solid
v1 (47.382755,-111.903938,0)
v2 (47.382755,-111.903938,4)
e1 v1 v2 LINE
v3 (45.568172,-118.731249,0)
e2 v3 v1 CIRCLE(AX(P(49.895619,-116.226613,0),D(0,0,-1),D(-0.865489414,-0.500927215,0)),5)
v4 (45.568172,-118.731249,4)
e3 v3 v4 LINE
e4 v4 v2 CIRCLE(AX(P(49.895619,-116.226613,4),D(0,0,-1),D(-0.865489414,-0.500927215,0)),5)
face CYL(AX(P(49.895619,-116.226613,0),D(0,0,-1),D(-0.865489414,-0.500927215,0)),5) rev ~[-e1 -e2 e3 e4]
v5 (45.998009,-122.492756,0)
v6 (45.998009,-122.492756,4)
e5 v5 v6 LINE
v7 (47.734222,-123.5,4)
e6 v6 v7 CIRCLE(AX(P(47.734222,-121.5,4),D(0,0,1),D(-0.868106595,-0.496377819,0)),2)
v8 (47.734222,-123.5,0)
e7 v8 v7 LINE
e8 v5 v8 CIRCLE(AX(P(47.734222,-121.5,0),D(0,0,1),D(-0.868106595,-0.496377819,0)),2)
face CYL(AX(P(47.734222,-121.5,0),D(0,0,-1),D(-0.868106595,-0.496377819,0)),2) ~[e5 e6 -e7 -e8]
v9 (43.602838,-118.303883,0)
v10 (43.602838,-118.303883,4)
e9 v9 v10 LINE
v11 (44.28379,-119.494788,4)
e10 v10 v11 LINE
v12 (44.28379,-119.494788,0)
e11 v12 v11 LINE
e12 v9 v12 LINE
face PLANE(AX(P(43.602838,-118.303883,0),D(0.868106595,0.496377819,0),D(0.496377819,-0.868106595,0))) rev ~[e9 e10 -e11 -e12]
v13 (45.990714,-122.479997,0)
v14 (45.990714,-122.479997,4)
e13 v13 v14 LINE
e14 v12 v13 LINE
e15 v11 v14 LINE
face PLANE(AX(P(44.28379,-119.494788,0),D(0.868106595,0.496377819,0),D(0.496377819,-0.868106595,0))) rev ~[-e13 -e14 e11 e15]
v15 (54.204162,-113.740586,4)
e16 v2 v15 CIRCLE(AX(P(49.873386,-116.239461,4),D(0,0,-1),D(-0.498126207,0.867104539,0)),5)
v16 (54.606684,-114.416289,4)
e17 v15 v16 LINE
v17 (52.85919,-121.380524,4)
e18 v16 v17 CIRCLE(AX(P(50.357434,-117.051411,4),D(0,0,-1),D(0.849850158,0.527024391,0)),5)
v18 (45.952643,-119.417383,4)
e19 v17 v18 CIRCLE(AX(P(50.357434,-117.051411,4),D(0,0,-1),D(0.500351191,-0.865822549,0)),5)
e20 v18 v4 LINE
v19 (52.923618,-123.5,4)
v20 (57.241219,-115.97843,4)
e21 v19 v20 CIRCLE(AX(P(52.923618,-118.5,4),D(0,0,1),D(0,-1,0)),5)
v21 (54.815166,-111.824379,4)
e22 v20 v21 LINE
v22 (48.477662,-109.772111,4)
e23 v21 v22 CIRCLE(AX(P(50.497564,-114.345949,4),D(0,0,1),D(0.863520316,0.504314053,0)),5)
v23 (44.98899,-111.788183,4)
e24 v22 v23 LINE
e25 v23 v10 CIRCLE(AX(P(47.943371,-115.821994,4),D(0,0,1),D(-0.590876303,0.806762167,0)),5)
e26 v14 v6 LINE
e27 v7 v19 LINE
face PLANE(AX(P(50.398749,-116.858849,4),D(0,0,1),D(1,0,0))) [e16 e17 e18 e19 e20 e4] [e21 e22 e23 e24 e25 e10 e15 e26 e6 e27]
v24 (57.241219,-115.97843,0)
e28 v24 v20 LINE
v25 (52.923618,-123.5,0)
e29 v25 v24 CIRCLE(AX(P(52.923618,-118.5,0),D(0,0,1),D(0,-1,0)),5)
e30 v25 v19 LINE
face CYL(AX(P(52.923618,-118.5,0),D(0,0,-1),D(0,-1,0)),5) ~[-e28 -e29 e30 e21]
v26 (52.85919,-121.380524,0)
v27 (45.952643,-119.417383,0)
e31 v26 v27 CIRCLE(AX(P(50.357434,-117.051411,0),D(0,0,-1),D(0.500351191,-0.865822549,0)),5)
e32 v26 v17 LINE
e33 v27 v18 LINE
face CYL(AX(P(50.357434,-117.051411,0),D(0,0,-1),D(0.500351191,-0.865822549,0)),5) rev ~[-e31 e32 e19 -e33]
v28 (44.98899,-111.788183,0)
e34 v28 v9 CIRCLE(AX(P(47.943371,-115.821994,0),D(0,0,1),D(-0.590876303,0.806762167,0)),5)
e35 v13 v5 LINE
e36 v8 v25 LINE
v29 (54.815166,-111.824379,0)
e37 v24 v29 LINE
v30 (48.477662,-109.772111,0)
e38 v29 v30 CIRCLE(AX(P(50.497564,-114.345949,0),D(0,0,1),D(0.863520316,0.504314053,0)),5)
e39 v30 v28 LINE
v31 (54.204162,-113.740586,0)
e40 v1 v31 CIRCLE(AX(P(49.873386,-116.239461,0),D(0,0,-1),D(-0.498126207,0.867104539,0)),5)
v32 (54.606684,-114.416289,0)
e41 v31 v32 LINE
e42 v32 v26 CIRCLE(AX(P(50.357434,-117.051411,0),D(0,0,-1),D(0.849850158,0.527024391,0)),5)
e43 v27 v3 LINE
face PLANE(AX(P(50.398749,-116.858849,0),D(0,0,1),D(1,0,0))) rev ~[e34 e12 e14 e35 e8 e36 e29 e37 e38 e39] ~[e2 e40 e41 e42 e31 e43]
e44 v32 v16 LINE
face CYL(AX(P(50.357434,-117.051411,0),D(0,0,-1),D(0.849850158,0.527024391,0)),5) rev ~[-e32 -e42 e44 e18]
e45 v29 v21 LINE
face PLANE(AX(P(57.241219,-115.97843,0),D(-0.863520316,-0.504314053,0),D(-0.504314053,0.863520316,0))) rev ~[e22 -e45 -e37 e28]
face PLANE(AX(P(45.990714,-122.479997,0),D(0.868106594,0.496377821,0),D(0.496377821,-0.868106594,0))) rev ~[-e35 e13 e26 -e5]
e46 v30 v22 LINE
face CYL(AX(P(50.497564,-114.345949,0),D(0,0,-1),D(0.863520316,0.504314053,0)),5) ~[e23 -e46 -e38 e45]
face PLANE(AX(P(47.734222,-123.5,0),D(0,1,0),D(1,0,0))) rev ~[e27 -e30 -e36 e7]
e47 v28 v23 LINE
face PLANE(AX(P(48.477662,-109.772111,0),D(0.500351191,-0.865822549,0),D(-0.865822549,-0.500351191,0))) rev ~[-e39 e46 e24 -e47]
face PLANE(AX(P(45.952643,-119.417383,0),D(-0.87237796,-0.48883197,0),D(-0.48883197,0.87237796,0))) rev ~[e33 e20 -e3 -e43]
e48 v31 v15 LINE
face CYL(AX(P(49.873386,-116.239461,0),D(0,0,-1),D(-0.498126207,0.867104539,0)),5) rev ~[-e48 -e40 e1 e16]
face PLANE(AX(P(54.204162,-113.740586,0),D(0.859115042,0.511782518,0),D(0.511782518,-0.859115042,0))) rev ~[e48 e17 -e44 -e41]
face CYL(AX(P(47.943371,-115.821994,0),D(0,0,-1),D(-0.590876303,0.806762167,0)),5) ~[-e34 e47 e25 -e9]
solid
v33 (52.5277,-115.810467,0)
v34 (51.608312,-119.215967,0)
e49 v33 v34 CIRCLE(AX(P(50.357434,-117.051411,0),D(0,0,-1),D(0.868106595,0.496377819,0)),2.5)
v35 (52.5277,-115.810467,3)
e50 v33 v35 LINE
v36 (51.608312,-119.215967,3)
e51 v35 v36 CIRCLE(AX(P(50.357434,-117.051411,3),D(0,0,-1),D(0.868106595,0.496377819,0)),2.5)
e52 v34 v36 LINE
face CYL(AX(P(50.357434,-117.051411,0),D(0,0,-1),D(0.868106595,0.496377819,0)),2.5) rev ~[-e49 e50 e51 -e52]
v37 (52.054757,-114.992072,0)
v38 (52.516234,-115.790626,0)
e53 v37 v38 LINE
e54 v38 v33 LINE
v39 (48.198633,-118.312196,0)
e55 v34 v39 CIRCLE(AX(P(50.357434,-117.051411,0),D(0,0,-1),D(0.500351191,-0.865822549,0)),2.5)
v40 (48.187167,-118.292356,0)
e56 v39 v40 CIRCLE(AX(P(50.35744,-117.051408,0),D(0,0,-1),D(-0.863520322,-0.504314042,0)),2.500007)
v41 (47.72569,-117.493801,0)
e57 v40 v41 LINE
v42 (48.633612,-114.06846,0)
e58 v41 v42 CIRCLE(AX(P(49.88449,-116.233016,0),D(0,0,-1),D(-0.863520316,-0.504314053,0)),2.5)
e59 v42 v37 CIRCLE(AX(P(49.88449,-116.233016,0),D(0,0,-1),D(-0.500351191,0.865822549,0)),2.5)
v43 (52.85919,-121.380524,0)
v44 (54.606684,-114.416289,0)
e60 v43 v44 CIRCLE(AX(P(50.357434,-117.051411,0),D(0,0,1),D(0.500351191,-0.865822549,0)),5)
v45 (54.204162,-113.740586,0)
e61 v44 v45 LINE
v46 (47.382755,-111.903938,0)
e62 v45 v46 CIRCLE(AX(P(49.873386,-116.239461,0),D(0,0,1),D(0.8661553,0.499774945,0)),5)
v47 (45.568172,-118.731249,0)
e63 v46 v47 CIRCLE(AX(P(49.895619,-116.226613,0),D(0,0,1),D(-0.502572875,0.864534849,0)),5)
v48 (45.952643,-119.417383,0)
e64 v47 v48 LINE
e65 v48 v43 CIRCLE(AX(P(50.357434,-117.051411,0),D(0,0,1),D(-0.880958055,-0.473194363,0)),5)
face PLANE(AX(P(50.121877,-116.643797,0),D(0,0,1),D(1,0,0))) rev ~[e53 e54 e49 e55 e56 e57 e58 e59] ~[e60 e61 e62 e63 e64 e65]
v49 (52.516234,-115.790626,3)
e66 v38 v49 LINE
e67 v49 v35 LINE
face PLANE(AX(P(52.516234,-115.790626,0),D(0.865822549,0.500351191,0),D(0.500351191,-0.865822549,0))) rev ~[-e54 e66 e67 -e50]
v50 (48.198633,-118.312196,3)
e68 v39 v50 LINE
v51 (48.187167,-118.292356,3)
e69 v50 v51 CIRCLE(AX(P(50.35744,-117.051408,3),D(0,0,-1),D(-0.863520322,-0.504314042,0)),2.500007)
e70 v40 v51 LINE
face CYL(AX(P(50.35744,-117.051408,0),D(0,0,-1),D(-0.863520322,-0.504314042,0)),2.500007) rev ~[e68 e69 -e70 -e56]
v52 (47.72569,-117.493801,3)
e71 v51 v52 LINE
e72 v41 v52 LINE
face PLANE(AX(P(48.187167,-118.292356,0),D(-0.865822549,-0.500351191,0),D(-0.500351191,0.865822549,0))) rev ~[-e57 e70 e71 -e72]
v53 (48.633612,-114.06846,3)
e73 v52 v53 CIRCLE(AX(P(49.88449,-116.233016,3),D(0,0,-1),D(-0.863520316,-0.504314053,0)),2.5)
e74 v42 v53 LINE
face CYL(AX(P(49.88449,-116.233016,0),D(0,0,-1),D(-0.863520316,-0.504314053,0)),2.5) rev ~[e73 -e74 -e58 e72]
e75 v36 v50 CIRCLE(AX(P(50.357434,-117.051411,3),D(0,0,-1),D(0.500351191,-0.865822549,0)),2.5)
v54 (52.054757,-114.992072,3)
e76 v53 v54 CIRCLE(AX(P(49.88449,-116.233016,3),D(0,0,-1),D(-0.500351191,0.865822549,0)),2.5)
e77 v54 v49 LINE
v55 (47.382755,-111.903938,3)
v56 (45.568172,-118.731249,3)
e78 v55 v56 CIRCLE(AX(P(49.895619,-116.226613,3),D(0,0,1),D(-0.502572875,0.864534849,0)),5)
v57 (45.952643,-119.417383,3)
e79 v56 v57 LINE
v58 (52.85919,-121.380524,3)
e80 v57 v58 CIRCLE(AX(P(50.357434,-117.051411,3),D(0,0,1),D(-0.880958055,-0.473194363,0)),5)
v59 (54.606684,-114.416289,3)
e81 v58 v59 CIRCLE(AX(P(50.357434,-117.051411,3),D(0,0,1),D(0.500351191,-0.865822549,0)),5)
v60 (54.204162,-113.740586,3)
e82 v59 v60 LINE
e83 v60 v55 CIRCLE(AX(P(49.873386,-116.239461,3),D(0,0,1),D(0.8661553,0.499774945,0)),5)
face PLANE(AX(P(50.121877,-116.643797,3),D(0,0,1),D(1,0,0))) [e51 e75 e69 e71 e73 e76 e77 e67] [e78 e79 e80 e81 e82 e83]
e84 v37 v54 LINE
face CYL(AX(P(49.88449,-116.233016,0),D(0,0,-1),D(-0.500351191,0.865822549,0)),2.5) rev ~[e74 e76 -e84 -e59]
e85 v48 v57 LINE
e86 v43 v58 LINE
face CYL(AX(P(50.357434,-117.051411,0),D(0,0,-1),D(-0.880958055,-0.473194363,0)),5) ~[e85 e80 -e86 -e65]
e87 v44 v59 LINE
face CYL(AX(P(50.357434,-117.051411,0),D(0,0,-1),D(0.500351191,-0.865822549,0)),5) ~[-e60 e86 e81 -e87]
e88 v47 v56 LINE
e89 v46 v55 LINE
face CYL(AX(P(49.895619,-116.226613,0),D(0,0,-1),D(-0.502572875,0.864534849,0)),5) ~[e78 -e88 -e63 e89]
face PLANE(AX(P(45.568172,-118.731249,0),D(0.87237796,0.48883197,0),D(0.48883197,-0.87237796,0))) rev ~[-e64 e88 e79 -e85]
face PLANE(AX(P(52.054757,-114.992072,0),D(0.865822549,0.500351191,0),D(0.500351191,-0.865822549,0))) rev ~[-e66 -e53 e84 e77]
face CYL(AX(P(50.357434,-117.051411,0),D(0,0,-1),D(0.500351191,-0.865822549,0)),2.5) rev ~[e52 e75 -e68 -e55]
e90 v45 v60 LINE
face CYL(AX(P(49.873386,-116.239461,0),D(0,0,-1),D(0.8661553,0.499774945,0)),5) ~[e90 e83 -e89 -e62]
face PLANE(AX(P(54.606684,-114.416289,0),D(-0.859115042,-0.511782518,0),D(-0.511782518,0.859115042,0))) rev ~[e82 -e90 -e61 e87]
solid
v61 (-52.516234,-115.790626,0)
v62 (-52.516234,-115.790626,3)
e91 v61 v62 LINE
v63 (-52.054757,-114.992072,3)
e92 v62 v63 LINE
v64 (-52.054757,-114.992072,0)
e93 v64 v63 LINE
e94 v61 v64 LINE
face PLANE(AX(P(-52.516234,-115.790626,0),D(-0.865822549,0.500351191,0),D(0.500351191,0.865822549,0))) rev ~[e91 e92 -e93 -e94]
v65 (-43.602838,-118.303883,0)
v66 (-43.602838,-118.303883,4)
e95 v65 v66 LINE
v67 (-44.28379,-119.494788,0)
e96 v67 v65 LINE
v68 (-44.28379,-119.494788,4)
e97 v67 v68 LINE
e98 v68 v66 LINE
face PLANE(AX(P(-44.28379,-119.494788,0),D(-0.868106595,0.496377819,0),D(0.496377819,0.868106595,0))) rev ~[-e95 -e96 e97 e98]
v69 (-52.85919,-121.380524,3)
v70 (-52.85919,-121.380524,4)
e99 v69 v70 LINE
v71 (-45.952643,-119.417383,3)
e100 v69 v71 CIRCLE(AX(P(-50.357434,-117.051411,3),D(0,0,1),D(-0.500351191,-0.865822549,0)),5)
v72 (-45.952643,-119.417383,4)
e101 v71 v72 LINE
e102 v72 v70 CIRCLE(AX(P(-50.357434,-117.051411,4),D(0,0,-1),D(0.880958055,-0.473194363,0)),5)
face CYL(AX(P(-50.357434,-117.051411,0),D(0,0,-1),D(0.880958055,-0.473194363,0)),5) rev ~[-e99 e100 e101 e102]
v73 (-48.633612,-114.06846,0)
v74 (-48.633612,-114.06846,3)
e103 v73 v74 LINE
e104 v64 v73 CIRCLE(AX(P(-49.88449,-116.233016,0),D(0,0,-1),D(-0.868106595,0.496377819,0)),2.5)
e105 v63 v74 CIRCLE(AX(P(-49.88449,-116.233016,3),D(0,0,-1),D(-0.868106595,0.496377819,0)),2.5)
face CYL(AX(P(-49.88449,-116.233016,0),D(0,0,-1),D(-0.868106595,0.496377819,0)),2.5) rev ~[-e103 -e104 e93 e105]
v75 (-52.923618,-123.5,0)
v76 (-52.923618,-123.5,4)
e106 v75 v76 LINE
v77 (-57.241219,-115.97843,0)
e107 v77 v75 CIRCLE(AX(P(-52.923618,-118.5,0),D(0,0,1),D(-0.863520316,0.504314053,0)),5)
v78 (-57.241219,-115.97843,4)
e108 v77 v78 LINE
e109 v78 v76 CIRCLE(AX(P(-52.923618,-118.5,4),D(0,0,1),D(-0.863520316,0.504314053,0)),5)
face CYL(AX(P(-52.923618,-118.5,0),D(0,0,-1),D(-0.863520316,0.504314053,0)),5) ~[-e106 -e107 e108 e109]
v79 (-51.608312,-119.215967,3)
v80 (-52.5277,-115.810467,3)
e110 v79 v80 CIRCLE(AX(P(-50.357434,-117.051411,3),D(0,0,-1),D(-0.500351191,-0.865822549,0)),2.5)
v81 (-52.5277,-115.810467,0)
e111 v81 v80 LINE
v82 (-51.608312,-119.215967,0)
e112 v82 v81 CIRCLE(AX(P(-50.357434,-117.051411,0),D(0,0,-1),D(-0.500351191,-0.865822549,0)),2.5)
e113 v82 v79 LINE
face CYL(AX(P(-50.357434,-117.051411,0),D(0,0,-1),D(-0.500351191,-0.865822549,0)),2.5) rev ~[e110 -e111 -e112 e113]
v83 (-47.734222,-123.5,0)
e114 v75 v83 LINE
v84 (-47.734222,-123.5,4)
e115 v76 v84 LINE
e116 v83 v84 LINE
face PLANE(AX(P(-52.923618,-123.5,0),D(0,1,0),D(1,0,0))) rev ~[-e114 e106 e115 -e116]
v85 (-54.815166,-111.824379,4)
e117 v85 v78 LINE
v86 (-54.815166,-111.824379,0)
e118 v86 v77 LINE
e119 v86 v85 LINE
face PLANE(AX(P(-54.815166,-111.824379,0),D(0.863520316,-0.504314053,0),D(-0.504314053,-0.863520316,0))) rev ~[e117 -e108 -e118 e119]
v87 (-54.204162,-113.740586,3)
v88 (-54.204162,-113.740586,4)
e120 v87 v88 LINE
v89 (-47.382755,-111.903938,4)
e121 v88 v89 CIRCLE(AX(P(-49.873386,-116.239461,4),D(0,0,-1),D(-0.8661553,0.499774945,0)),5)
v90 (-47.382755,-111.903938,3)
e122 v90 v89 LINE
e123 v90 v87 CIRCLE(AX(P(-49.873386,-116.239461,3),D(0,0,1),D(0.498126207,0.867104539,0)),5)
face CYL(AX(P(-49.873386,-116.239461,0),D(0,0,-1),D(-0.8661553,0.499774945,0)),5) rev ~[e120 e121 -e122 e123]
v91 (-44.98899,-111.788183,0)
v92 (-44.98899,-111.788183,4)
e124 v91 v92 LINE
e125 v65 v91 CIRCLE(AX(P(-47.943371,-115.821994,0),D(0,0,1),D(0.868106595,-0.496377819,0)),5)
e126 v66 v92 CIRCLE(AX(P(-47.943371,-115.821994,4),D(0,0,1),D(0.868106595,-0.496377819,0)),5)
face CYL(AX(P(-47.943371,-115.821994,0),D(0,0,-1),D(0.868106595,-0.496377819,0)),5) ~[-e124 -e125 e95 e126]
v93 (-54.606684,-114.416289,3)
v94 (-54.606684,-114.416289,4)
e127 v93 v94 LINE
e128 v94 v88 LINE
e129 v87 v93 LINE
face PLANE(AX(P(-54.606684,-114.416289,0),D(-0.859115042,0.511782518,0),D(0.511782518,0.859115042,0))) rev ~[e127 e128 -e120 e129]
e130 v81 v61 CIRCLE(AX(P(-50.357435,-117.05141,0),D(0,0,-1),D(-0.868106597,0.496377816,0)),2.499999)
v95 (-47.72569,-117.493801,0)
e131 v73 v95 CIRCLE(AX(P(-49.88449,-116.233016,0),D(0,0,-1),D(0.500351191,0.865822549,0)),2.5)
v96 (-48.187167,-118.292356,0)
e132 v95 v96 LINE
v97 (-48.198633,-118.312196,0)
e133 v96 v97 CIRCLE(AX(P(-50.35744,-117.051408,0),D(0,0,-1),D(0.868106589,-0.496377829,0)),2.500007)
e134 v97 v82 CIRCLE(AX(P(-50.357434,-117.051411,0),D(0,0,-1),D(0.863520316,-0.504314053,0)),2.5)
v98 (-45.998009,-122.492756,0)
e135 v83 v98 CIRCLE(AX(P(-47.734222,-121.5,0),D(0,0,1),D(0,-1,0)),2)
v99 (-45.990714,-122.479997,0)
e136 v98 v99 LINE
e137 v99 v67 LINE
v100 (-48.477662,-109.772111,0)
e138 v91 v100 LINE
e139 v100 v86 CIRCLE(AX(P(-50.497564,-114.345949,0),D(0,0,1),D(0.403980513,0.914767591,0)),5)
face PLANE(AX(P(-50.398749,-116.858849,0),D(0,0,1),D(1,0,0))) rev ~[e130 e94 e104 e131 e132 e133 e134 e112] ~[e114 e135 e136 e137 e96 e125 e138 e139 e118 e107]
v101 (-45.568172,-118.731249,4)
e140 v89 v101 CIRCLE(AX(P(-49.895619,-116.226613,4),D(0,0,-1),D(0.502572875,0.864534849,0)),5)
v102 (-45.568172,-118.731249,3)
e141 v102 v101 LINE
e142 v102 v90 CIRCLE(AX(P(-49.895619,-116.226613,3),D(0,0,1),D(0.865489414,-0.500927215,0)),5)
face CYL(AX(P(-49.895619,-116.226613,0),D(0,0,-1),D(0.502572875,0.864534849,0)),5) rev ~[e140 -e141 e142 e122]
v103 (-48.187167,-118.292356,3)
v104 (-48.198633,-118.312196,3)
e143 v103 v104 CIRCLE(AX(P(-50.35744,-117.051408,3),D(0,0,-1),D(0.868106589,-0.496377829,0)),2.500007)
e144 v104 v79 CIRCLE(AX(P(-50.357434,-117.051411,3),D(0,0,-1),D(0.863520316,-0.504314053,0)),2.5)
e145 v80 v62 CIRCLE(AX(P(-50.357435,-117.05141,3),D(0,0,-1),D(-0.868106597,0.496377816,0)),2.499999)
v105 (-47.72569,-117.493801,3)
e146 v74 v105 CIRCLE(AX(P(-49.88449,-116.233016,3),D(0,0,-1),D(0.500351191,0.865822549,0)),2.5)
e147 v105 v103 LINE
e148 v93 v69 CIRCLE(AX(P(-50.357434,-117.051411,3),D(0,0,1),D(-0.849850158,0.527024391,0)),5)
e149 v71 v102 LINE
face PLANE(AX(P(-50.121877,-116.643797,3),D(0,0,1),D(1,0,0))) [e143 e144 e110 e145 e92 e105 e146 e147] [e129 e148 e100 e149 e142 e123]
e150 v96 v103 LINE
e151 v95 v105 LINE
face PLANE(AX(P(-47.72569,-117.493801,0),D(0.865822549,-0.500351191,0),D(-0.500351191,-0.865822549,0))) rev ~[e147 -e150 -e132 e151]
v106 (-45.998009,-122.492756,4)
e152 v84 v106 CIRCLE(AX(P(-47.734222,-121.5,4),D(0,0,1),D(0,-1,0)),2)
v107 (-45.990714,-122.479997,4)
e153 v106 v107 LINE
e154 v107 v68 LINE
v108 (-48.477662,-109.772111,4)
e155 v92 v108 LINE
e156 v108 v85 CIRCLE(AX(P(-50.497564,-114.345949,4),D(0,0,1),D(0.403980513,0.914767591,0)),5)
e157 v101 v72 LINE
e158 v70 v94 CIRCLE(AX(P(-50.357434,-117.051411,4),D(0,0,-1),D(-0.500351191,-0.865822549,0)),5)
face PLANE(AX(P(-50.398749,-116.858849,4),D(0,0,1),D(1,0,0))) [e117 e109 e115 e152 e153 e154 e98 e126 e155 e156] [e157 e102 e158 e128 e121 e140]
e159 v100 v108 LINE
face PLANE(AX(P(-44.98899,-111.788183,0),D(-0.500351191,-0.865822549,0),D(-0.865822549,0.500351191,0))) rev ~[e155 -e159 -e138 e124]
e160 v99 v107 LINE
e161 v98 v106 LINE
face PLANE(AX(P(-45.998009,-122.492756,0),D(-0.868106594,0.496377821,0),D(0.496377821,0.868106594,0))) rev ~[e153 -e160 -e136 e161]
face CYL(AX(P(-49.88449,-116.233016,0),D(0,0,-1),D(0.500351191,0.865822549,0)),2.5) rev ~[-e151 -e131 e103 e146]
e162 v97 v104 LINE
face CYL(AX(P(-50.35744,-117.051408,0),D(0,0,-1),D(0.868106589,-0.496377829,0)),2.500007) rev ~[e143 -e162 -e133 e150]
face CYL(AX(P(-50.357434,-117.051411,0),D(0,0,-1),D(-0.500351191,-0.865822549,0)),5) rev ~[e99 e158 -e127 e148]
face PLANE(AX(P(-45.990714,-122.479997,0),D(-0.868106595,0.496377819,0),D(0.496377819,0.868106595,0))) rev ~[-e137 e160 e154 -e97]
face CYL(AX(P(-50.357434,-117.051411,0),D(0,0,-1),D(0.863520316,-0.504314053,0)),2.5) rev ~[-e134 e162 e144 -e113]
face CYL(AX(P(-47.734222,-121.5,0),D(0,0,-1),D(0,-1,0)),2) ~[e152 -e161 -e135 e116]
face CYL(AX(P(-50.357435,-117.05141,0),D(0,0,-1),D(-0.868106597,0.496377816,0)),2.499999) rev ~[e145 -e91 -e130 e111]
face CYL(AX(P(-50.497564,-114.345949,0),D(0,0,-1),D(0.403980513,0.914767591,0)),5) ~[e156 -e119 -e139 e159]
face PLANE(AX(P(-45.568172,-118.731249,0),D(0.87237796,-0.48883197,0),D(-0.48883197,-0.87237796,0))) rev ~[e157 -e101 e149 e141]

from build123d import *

# Parameters (mm, degrees)
F1_DEPTH = 3
F2_DEPTH = 4


# Not quite as in the source:
# - a feature of the source that left no trace in its solid (it failed there, or was rolled back) is left out


with BuildPart() as f1:
    # F0 (on Top) → F1 (new body)
    with BuildSketch(Plane.XY):
        with BuildLine():
            Line((-45.9526433684, -119.4173828764), (-45.5681720757, -118.7312487792))
            ThreePointArc((-45.5681720757, -118.7312487792), (-45.063382941, -114.9422867004), (-47.382754767, -111.9039384587))
            ThreePointArc((-47.382754767, -111.9039384587), (-51.1733291767, -111.4114028263), (-54.204162304, -113.74058643))
            Line((-54.204162304, -113.74058643), (-54.606684435, -114.4162891074))
            ThreePointArc((-54.606684435, -114.4162891074), (-55.2070897412, -118.268307011), (-52.8591895991, -121.3805238068))
            ThreePointArc((-52.8591895991, -121.3805238068), (-48.9903690941, -121.8608948729), (-45.9526433684, -119.4173828764))
        make_face()
        with BuildLine():
            ThreePointArc((-48.1986328556, -118.3121961967), (-49.7169013888, -119.4679619999), (-51.608311622, -119.2159674351))
            ThreePointArc((-51.608311622, -119.2159674351), (-52.7710236039, -117.703011792), (-52.5277001335, -115.8104665166))
            ThreePointArc((-52.5277001335, -115.8104665166), (-52.5219900166, -115.8005330863), (-52.5162344341, -115.7906259301))
            Line((-52.5162344341, -115.7906259301), (-52.0547569365, -114.9920715737))
            ThreePointArc((-52.0547569365, -114.9920715737), (-50.5360911765, -113.8194261615), (-48.6336124708, -114.0684597488))
            ThreePointArc((-48.6336124708, -114.0684597488), (-47.4679395113, -115.5924838645), (-47.7256896586, -117.4938012538))
            Line((-47.7256896586, -117.4938012538), (-48.1871671562, -118.2923556102))
            ThreePointArc((-48.1871671562, -118.2923556102), (-48.1928772732, -118.3022890405), (-48.1986328556, -118.3121961967))
        make_face(mode=Mode.SUBTRACT)
    extrude(amount=F1_DEPTH)

    # F0 (on Top) → F2 (join)
    with BuildSketch(Plane.XY):
        with BuildLine():
            Line((-44.9889898264, -111.7881834274), (-48.4776615988, -109.7721108748))
            ThreePointArc((-48.4776615988, -109.7721108748), (-52.0379556259, -109.5891437921), (-54.8151657439, -111.8243785613))
            Line((-54.8151657439, -111.8243785613), (-57.2412191282, -115.9784297334))
            ThreePointArc((-57.2412191282, -115.9784297334), (-57.2599668976, -120.989191502), (-52.9236175497, -123.5))
            Line((-52.9236175497, -123.5), (-47.7342220294, -123.5))
            ThreePointArc((-47.7342220294, -123.5), (-46.7306063846, -123.2299582762), (-45.9980088385, -122.4927556374))
            Line((-45.9980088385, -122.4927556374), (-45.9907136957, -122.4799972882))
            Line((-45.9907136957, -122.4799972882), (-44.2837898974, -119.4947877334))
            Line((-44.2837898974, -119.4947877334), (-43.6028383647, -118.3038833569))
            ThreePointArc((-43.6028383647, -118.3038833569), (-43.0528160814, -114.7815764423), (-44.9889898264, -111.7881834274))
        make_face()
        with BuildLine():
            ThreePointArc((-47.382754767, -111.9039384587), (-45.063382941, -114.9422867004), (-45.5681720757, -118.7312487792))
            Line((-45.5681720757, -118.7312487792), (-45.9526433684, -119.4173828764))
            ThreePointArc((-45.9526433684, -119.4173828764), (-48.9903690941, -121.8608948729), (-52.8591895991, -121.3805238068))
            ThreePointArc((-52.8591895991, -121.3805238068), (-55.2070897412, -118.268307011), (-54.606684435, -114.4162891074))
            Line((-54.606684435, -114.4162891074), (-54.204162304, -113.74058643))
            ThreePointArc((-54.204162304, -113.74058643), (-51.1733291767, -111.4114028263), (-47.382754767, -111.9039384587))
        make_face(mode=Mode.SUBTRACT)
    extrude(amount=F2_DEPTH)


with BuildPart() as f1b:
    # F0 (on Top) → F1, piece 2 (new body)
    with BuildSketch(Plane.XY):
        with BuildLine():
            ThreePointArc((47.382754767, -111.9039384587), (45.063382941, -114.9422867004), (45.5681720757, -118.7312487792))
            Line((45.5681720757, -118.7312487792), (45.9526433684, -119.4173828764))
            ThreePointArc((45.9526433684, -119.4173828764), (48.9903690941, -121.8608948729), (52.8591895991, -121.3805238068))
            ThreePointArc((52.8591895991, -121.3805238068), (55.2070897412, -118.268307011), (54.606684435, -114.4162891074))
            Line((54.606684435, -114.4162891074), (54.204162304, -113.74058643))
            ThreePointArc((54.204162304, -113.74058643), (51.1733291767, -111.4114028263), (47.382754767, -111.9039384587))
        make_face()
        with BuildLine():
            ThreePointArc((48.6336124708, -114.0684597488), (50.5360911765, -113.8194261615), (52.0547569365, -114.9920715737))
            Line((52.0547569365, -114.9920715737), (52.5162344341, -115.7906259301))
            Line((52.5162344341, -115.7906259301), (52.5277001335, -115.8104665166))
            ThreePointArc((52.5277001335, -115.8104665166), (52.7710236039, -117.703011792), (51.608311622, -119.2159674351))
            ThreePointArc((51.608311622, -119.2159674351), (49.7169013888, -119.4679619999), (48.1986328556, -118.3121961967))
            ThreePointArc((48.1986328556, -118.3121961967), (48.1928772732, -118.3022890405), (48.1871671562, -118.2923556102))
            Line((48.1871671562, -118.2923556102), (47.7256896586, -117.4938012538))
            ThreePointArc((47.7256896586, -117.4938012538), (47.4679395113, -115.5924838645), (48.6336124708, -114.0684597488))
        make_face(mode=Mode.SUBTRACT)
    extrude(amount=F1_DEPTH)


with BuildPart() as f2:
    # F0 (on Top) → F2, piece 2 (new body)
    with BuildSketch(Plane.XY):
        with BuildLine():
            ThreePointArc((54.8151657439, -111.8243785613), (52.0379556259, -109.5891437921), (48.4776615988, -109.7721108748))
            Line((48.4776615988, -109.7721108748), (44.9889898264, -111.7881834274))
            ThreePointArc((44.9889898264, -111.7881834274), (43.0528160814, -114.7815764423), (43.6028383647, -118.3038833569))
            Line((43.6028383647, -118.3038833569), (44.2837898974, -119.4947877334))
            Line((44.2837898974, -119.4947877334), (45.9907136957, -122.4799972882))
            Line((45.9907136957, -122.4799972882), (45.9980088385, -122.4927556374))
            ThreePointArc((45.9980088385, -122.4927556374), (46.7306063846, -123.2299582762), (47.7342220294, -123.5))
            Line((47.7342220294, -123.5), (52.9236175497, -123.5))
            ThreePointArc((52.9236175497, -123.5), (57.2599668976, -120.989191502), (57.2412191282, -115.9784297334))
            Line((57.2412191282, -115.9784297334), (54.8151657439, -111.8243785613))
        make_face()
        with BuildLine():
            Line((45.9526433684, -119.4173828764), (45.5681720757, -118.7312487792))
            ThreePointArc((45.5681720757, -118.7312487792), (45.063382941, -114.9422867004), (47.382754767, -111.9039384587))
            ThreePointArc((47.382754767, -111.9039384587), (51.1733291767, -111.4114028263), (54.204162304, -113.74058643))
            Line((54.204162304, -113.74058643), (54.606684435, -114.4162891074))
            ThreePointArc((54.606684435, -114.4162891074), (55.2070897412, -118.268307011), (52.8591895991, -121.3805238068))
            ThreePointArc((52.8591895991, -121.3805238068), (48.9903690941, -121.8608948729), (45.9526433684, -119.4173828764))
        make_face(mode=Mode.SUBTRACT)
    extrude(amount=F2_DEPTH)


solid = Compound([f1.part, f1b.part, f2.part])
